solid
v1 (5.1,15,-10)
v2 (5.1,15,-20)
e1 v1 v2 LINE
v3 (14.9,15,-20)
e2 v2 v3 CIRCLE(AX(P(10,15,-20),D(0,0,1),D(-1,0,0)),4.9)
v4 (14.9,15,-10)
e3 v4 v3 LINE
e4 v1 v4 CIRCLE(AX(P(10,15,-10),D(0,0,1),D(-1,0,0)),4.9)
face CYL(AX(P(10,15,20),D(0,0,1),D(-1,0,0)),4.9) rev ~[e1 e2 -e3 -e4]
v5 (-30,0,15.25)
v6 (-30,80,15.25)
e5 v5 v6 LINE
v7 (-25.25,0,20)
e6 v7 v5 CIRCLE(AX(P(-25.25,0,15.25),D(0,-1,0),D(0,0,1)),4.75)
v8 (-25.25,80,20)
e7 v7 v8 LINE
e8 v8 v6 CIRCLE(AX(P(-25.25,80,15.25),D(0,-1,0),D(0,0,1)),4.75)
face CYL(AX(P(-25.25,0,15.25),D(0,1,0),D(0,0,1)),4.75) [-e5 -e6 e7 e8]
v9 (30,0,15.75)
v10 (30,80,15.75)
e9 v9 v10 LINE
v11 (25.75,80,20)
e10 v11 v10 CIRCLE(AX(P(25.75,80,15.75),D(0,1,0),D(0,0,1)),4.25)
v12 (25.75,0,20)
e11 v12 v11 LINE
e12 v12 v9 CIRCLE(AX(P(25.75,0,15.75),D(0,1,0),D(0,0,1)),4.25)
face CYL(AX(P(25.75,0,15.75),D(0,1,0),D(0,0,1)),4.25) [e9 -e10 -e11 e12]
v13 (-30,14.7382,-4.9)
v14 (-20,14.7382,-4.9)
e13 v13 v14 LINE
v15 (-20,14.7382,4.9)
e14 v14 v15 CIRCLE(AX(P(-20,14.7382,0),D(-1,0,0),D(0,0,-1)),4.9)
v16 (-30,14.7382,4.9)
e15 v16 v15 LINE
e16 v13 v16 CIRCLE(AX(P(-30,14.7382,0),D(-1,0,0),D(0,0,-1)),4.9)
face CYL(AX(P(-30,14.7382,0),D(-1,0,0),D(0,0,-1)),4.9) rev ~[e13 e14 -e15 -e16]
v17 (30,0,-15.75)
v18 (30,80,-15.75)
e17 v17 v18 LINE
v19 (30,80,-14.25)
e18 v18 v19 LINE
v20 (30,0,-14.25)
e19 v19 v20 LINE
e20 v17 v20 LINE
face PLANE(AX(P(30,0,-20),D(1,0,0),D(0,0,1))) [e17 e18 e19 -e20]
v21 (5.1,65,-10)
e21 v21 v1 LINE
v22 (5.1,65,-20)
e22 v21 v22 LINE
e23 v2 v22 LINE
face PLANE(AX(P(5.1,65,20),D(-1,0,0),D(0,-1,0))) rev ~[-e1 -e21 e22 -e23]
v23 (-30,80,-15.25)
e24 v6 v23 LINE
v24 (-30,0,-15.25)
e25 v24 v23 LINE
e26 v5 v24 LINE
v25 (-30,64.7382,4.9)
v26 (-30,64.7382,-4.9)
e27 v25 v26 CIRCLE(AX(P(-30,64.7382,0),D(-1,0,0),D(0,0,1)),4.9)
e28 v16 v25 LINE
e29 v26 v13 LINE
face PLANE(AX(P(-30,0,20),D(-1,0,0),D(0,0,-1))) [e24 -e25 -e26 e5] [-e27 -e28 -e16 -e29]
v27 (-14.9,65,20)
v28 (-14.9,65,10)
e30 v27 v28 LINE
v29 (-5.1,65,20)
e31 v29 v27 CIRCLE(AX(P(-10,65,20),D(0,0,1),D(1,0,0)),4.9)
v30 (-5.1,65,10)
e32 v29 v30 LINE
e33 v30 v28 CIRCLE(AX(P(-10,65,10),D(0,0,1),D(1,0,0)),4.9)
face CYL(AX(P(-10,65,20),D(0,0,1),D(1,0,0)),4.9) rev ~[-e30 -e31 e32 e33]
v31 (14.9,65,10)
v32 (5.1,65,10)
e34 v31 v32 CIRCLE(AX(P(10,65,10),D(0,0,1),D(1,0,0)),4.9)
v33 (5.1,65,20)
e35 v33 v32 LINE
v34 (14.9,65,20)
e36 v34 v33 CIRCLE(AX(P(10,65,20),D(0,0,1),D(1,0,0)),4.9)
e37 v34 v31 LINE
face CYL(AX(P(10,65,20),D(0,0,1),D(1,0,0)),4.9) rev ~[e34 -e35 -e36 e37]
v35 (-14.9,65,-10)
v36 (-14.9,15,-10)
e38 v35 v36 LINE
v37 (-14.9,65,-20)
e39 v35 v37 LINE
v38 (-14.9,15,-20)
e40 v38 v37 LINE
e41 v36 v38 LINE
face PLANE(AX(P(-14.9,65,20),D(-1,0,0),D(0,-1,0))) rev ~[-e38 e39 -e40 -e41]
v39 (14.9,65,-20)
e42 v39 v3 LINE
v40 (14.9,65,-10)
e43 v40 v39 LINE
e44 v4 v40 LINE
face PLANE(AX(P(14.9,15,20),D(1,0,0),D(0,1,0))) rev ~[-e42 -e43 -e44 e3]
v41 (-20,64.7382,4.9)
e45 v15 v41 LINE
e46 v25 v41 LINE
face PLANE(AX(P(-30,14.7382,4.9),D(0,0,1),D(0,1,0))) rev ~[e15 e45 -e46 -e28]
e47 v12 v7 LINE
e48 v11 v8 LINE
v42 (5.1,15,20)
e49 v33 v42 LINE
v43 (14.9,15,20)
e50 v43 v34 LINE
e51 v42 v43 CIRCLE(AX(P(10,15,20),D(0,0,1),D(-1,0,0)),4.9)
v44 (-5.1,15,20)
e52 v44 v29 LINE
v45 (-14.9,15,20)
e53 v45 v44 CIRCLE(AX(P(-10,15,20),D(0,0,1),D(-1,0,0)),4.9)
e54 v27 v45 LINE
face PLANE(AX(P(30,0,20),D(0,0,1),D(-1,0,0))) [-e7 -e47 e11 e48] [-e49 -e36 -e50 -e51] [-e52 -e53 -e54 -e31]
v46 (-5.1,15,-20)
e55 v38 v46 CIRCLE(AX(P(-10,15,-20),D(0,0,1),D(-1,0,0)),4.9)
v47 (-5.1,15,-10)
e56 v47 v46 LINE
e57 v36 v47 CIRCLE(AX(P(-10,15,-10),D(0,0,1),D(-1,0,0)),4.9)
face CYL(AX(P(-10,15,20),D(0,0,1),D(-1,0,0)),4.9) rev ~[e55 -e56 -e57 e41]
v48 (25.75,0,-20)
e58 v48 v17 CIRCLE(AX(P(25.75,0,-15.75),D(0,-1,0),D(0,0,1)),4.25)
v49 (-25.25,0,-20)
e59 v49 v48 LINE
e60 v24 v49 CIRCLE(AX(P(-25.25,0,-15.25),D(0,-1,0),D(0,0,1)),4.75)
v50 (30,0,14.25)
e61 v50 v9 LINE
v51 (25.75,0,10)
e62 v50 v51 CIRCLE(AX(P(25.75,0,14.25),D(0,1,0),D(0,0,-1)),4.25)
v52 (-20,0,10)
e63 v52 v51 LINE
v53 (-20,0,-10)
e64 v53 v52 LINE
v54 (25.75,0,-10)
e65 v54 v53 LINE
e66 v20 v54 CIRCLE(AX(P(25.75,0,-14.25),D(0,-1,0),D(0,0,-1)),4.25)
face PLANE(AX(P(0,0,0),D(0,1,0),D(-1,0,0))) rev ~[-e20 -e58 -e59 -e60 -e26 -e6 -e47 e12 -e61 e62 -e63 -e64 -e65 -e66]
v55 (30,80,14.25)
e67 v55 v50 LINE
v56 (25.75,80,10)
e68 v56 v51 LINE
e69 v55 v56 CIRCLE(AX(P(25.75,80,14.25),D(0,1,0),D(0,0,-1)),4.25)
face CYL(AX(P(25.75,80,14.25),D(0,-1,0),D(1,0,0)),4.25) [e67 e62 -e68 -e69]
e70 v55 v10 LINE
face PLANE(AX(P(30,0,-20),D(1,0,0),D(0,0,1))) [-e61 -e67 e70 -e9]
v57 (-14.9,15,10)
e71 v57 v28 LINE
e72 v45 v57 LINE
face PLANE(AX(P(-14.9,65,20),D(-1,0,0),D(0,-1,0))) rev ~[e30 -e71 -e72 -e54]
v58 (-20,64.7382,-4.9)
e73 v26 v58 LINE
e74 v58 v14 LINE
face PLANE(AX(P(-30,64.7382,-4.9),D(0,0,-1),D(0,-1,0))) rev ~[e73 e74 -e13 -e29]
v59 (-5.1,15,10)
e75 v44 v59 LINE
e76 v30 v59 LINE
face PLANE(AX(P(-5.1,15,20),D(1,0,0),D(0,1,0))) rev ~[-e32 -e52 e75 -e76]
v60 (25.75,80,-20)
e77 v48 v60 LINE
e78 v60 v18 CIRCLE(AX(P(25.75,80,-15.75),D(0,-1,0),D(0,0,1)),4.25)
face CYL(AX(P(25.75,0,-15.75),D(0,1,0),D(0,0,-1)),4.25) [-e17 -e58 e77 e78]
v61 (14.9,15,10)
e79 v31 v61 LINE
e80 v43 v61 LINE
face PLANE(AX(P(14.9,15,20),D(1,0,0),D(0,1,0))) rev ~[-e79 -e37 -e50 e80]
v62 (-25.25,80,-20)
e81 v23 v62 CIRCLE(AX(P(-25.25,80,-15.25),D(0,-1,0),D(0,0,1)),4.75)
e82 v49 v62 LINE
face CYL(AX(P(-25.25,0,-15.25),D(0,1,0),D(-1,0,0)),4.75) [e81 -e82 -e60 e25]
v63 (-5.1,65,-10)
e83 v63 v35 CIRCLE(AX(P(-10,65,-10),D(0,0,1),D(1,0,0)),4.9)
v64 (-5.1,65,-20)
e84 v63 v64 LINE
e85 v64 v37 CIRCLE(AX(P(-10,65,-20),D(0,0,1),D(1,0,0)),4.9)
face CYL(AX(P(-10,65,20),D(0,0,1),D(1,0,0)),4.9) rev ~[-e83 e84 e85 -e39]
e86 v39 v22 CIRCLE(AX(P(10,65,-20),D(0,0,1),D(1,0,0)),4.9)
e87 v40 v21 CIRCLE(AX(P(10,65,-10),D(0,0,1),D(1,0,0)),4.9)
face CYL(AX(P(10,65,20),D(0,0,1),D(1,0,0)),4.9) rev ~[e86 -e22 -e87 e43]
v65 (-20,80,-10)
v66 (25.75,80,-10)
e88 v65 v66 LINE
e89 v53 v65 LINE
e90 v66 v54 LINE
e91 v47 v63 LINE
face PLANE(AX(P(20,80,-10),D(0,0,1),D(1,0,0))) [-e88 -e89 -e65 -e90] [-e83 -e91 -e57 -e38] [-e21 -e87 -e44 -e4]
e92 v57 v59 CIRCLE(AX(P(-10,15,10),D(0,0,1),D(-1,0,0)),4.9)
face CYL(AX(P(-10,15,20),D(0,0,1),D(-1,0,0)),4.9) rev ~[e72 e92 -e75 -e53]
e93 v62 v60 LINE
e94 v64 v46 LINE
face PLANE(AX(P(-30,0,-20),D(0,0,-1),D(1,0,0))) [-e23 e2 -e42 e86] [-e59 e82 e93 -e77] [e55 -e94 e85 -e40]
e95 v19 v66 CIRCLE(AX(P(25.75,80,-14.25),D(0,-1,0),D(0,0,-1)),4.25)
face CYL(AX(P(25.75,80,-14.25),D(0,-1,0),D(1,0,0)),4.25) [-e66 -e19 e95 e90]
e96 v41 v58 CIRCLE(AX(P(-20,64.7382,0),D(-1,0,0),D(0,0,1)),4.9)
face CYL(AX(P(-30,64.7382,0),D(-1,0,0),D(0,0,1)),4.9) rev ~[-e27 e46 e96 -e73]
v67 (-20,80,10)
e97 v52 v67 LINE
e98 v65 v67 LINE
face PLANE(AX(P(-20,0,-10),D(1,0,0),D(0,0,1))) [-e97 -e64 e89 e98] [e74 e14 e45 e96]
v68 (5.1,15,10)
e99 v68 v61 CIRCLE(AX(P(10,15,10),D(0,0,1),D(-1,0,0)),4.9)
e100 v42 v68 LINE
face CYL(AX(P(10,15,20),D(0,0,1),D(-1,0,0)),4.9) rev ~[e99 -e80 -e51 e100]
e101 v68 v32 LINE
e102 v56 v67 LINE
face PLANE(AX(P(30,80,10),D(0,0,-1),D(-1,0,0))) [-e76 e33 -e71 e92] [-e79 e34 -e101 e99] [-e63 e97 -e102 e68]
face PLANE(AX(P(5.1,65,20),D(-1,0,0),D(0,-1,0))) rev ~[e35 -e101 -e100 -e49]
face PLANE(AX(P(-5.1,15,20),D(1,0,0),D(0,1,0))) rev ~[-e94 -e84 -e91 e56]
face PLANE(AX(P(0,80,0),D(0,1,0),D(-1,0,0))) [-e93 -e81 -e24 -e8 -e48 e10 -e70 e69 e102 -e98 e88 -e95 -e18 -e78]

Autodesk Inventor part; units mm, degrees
ref_plane "YZ Plane" through (0, 0, 0) normal (1, 0, 0) x (0, 1, 0)
ref_plane "XZ Plane" through (0, 0, 0) normal (0, 1, 0) x (-1, 0, 0)
ref_plane "XY Plane" through (0, 0, 0) normal (0, 0, 1) x (1, 0, 0)
sketch "Sketch1" plane through (0, 0, 0) normal (0, 1, 0) x (-1, 0, 0)
  line L0 (20, 10) -> (-20, 10)
  line L1 (-20, 10) -> (-20, -10)
  line L2 (-20, -10) -> (20, -10)
  line L3 (20, -10) -> (20, 10)
  line L4 (20, 10) -> (-20, -10) construction
  line L5 (-20, 10) -> (20, -10) construction
  line L6 (-30, 20) -> (30, 20)
  line L7 (30, 20) -> (30, -20)
  line L8 (30, -20) -> (-30, -20)
  line L9 (-30, -20) -> (-30, 20)
  line L10 (30, 0) -> (-30, 0) construction
  line L11 (-20, 0) -> (-10, 0) construction
  line L12 (-10, 10) -> (-10, -10) construction
  line L13 (20, 10) -> (10, 10) construction
  line L14 (10, 10) -> (10, -10) construction
  point P0 (0, 0)
  dimension "d0" = 40
  dimension "d1" = 20
  dimension "d2" = 10
  dimension "d3" = 10
  dimension "d4" = 10
extrude "Extrusion1" add sketch "Sketch1" along normal blind 80
sketch "Sketch2" plane through (-30, 0, 20) normal (0, 0, 1) x (1, 0, 0)
  line L0 (0, 0) -> (0, 80) projected
  line L1 (0, 40) -> (20, 40) construction
  line L2 (60, 0) -> (60, 80) projected
  line L3 (60, 40) -> (40, 40) construction
  line L4 (50, 0) -> (10, 0) projected
  line L5 (20, 0) -> (20, 70) construction
  line L6 (40, 0) -> (40, 80) construction
  line L7 (60, 80) -> (0, 80) projected
  line L8 (20, 65) -> (20, 15) construction
  line L9 (15.1, 65) -> (15.1, 15)
  line L10 (24.9, 15) -> (24.9, 65)
  arc A0 (24.9, 65) -> (15.1, 65) centre (20, 65) ccw
  arc A1 (15.1, 15) -> (24.9, 15) centre (20, 15) ccw
  line L11 (40, 65) -> (40, 15) construction
  line L12 (35.1, 65) -> (35.1, 15)
  line L13 (44.9, 15) -> (44.9, 65)
  arc A2 (44.9, 65) -> (35.1, 65) centre (40, 65) ccw
  arc A3 (35.1, 15) -> (44.9, 15) centre (40, 15) ccw
  point P0 (30, 0)
  dimension "d7" = 20
  dimension "d8" = 20
  dimension "d9" = 25
  dimension "d10" = 9.8
  dimension "d11" = 9.8
extrude "Extrusion2" cut sketch "Sketch2" against normal through all
sketch "Sketch3" plane through (-30, 0, -20) normal (-1, 0, 0) x (0, 0, 1)
  line L0 (20, 0) -> (20, 79.4763) construction
  line L1 (20, 64.7382) -> (20, 14.7382) construction
  line L2 (15.1, 64.7382) -> (15.1, 14.7382)
  line L3 (24.9, 14.7382) -> (24.9, 64.7382)
  arc A0 (24.9, 64.7382) -> (15.1, 64.7382) centre (20, 64.7382) ccw
  arc A1 (15.1, 14.7382) -> (24.9, 14.7382) centre (20, 14.7382) ccw
  point P0 (20, 39.7382)
  dimension "d14" = 25
  dimension "d15" = 9.8
extrude "Extrusion3" cut sketch "Sketch3" against normal blind 10
sketch "Sketch5" plane through (0, 80, 0) normal (0, 1, 0) x (1, 0, 0)
  line L0 (-20, 10) -> (20, 10) projected
  line L1 (30, -20) -> (30, 20) projected
  line L2 (20, 10) -> (30, 10)
  line L3 (30, 10) -> (30, -10)
  line L4 (30, -10) -> (20, -10)
  line L5 (20, -10) -> (20, 10)
  point P0 (0, 0)
  dimension "d18" = 20
extrude "Extrusion4" cut sketch "Sketch5" against normal through all
fillet "Fillet1" radius 4.25 4 edges at (30, 40, 10) (30, 40, -10) (30, 40, -20) (30, 40, 20)
fillet "Fillet2" radius 4.75 2 edges at (-30, 40, 20) (-30, 40, -20)
properties part number "VerticalBeamMount" material "ABS Plastic"
